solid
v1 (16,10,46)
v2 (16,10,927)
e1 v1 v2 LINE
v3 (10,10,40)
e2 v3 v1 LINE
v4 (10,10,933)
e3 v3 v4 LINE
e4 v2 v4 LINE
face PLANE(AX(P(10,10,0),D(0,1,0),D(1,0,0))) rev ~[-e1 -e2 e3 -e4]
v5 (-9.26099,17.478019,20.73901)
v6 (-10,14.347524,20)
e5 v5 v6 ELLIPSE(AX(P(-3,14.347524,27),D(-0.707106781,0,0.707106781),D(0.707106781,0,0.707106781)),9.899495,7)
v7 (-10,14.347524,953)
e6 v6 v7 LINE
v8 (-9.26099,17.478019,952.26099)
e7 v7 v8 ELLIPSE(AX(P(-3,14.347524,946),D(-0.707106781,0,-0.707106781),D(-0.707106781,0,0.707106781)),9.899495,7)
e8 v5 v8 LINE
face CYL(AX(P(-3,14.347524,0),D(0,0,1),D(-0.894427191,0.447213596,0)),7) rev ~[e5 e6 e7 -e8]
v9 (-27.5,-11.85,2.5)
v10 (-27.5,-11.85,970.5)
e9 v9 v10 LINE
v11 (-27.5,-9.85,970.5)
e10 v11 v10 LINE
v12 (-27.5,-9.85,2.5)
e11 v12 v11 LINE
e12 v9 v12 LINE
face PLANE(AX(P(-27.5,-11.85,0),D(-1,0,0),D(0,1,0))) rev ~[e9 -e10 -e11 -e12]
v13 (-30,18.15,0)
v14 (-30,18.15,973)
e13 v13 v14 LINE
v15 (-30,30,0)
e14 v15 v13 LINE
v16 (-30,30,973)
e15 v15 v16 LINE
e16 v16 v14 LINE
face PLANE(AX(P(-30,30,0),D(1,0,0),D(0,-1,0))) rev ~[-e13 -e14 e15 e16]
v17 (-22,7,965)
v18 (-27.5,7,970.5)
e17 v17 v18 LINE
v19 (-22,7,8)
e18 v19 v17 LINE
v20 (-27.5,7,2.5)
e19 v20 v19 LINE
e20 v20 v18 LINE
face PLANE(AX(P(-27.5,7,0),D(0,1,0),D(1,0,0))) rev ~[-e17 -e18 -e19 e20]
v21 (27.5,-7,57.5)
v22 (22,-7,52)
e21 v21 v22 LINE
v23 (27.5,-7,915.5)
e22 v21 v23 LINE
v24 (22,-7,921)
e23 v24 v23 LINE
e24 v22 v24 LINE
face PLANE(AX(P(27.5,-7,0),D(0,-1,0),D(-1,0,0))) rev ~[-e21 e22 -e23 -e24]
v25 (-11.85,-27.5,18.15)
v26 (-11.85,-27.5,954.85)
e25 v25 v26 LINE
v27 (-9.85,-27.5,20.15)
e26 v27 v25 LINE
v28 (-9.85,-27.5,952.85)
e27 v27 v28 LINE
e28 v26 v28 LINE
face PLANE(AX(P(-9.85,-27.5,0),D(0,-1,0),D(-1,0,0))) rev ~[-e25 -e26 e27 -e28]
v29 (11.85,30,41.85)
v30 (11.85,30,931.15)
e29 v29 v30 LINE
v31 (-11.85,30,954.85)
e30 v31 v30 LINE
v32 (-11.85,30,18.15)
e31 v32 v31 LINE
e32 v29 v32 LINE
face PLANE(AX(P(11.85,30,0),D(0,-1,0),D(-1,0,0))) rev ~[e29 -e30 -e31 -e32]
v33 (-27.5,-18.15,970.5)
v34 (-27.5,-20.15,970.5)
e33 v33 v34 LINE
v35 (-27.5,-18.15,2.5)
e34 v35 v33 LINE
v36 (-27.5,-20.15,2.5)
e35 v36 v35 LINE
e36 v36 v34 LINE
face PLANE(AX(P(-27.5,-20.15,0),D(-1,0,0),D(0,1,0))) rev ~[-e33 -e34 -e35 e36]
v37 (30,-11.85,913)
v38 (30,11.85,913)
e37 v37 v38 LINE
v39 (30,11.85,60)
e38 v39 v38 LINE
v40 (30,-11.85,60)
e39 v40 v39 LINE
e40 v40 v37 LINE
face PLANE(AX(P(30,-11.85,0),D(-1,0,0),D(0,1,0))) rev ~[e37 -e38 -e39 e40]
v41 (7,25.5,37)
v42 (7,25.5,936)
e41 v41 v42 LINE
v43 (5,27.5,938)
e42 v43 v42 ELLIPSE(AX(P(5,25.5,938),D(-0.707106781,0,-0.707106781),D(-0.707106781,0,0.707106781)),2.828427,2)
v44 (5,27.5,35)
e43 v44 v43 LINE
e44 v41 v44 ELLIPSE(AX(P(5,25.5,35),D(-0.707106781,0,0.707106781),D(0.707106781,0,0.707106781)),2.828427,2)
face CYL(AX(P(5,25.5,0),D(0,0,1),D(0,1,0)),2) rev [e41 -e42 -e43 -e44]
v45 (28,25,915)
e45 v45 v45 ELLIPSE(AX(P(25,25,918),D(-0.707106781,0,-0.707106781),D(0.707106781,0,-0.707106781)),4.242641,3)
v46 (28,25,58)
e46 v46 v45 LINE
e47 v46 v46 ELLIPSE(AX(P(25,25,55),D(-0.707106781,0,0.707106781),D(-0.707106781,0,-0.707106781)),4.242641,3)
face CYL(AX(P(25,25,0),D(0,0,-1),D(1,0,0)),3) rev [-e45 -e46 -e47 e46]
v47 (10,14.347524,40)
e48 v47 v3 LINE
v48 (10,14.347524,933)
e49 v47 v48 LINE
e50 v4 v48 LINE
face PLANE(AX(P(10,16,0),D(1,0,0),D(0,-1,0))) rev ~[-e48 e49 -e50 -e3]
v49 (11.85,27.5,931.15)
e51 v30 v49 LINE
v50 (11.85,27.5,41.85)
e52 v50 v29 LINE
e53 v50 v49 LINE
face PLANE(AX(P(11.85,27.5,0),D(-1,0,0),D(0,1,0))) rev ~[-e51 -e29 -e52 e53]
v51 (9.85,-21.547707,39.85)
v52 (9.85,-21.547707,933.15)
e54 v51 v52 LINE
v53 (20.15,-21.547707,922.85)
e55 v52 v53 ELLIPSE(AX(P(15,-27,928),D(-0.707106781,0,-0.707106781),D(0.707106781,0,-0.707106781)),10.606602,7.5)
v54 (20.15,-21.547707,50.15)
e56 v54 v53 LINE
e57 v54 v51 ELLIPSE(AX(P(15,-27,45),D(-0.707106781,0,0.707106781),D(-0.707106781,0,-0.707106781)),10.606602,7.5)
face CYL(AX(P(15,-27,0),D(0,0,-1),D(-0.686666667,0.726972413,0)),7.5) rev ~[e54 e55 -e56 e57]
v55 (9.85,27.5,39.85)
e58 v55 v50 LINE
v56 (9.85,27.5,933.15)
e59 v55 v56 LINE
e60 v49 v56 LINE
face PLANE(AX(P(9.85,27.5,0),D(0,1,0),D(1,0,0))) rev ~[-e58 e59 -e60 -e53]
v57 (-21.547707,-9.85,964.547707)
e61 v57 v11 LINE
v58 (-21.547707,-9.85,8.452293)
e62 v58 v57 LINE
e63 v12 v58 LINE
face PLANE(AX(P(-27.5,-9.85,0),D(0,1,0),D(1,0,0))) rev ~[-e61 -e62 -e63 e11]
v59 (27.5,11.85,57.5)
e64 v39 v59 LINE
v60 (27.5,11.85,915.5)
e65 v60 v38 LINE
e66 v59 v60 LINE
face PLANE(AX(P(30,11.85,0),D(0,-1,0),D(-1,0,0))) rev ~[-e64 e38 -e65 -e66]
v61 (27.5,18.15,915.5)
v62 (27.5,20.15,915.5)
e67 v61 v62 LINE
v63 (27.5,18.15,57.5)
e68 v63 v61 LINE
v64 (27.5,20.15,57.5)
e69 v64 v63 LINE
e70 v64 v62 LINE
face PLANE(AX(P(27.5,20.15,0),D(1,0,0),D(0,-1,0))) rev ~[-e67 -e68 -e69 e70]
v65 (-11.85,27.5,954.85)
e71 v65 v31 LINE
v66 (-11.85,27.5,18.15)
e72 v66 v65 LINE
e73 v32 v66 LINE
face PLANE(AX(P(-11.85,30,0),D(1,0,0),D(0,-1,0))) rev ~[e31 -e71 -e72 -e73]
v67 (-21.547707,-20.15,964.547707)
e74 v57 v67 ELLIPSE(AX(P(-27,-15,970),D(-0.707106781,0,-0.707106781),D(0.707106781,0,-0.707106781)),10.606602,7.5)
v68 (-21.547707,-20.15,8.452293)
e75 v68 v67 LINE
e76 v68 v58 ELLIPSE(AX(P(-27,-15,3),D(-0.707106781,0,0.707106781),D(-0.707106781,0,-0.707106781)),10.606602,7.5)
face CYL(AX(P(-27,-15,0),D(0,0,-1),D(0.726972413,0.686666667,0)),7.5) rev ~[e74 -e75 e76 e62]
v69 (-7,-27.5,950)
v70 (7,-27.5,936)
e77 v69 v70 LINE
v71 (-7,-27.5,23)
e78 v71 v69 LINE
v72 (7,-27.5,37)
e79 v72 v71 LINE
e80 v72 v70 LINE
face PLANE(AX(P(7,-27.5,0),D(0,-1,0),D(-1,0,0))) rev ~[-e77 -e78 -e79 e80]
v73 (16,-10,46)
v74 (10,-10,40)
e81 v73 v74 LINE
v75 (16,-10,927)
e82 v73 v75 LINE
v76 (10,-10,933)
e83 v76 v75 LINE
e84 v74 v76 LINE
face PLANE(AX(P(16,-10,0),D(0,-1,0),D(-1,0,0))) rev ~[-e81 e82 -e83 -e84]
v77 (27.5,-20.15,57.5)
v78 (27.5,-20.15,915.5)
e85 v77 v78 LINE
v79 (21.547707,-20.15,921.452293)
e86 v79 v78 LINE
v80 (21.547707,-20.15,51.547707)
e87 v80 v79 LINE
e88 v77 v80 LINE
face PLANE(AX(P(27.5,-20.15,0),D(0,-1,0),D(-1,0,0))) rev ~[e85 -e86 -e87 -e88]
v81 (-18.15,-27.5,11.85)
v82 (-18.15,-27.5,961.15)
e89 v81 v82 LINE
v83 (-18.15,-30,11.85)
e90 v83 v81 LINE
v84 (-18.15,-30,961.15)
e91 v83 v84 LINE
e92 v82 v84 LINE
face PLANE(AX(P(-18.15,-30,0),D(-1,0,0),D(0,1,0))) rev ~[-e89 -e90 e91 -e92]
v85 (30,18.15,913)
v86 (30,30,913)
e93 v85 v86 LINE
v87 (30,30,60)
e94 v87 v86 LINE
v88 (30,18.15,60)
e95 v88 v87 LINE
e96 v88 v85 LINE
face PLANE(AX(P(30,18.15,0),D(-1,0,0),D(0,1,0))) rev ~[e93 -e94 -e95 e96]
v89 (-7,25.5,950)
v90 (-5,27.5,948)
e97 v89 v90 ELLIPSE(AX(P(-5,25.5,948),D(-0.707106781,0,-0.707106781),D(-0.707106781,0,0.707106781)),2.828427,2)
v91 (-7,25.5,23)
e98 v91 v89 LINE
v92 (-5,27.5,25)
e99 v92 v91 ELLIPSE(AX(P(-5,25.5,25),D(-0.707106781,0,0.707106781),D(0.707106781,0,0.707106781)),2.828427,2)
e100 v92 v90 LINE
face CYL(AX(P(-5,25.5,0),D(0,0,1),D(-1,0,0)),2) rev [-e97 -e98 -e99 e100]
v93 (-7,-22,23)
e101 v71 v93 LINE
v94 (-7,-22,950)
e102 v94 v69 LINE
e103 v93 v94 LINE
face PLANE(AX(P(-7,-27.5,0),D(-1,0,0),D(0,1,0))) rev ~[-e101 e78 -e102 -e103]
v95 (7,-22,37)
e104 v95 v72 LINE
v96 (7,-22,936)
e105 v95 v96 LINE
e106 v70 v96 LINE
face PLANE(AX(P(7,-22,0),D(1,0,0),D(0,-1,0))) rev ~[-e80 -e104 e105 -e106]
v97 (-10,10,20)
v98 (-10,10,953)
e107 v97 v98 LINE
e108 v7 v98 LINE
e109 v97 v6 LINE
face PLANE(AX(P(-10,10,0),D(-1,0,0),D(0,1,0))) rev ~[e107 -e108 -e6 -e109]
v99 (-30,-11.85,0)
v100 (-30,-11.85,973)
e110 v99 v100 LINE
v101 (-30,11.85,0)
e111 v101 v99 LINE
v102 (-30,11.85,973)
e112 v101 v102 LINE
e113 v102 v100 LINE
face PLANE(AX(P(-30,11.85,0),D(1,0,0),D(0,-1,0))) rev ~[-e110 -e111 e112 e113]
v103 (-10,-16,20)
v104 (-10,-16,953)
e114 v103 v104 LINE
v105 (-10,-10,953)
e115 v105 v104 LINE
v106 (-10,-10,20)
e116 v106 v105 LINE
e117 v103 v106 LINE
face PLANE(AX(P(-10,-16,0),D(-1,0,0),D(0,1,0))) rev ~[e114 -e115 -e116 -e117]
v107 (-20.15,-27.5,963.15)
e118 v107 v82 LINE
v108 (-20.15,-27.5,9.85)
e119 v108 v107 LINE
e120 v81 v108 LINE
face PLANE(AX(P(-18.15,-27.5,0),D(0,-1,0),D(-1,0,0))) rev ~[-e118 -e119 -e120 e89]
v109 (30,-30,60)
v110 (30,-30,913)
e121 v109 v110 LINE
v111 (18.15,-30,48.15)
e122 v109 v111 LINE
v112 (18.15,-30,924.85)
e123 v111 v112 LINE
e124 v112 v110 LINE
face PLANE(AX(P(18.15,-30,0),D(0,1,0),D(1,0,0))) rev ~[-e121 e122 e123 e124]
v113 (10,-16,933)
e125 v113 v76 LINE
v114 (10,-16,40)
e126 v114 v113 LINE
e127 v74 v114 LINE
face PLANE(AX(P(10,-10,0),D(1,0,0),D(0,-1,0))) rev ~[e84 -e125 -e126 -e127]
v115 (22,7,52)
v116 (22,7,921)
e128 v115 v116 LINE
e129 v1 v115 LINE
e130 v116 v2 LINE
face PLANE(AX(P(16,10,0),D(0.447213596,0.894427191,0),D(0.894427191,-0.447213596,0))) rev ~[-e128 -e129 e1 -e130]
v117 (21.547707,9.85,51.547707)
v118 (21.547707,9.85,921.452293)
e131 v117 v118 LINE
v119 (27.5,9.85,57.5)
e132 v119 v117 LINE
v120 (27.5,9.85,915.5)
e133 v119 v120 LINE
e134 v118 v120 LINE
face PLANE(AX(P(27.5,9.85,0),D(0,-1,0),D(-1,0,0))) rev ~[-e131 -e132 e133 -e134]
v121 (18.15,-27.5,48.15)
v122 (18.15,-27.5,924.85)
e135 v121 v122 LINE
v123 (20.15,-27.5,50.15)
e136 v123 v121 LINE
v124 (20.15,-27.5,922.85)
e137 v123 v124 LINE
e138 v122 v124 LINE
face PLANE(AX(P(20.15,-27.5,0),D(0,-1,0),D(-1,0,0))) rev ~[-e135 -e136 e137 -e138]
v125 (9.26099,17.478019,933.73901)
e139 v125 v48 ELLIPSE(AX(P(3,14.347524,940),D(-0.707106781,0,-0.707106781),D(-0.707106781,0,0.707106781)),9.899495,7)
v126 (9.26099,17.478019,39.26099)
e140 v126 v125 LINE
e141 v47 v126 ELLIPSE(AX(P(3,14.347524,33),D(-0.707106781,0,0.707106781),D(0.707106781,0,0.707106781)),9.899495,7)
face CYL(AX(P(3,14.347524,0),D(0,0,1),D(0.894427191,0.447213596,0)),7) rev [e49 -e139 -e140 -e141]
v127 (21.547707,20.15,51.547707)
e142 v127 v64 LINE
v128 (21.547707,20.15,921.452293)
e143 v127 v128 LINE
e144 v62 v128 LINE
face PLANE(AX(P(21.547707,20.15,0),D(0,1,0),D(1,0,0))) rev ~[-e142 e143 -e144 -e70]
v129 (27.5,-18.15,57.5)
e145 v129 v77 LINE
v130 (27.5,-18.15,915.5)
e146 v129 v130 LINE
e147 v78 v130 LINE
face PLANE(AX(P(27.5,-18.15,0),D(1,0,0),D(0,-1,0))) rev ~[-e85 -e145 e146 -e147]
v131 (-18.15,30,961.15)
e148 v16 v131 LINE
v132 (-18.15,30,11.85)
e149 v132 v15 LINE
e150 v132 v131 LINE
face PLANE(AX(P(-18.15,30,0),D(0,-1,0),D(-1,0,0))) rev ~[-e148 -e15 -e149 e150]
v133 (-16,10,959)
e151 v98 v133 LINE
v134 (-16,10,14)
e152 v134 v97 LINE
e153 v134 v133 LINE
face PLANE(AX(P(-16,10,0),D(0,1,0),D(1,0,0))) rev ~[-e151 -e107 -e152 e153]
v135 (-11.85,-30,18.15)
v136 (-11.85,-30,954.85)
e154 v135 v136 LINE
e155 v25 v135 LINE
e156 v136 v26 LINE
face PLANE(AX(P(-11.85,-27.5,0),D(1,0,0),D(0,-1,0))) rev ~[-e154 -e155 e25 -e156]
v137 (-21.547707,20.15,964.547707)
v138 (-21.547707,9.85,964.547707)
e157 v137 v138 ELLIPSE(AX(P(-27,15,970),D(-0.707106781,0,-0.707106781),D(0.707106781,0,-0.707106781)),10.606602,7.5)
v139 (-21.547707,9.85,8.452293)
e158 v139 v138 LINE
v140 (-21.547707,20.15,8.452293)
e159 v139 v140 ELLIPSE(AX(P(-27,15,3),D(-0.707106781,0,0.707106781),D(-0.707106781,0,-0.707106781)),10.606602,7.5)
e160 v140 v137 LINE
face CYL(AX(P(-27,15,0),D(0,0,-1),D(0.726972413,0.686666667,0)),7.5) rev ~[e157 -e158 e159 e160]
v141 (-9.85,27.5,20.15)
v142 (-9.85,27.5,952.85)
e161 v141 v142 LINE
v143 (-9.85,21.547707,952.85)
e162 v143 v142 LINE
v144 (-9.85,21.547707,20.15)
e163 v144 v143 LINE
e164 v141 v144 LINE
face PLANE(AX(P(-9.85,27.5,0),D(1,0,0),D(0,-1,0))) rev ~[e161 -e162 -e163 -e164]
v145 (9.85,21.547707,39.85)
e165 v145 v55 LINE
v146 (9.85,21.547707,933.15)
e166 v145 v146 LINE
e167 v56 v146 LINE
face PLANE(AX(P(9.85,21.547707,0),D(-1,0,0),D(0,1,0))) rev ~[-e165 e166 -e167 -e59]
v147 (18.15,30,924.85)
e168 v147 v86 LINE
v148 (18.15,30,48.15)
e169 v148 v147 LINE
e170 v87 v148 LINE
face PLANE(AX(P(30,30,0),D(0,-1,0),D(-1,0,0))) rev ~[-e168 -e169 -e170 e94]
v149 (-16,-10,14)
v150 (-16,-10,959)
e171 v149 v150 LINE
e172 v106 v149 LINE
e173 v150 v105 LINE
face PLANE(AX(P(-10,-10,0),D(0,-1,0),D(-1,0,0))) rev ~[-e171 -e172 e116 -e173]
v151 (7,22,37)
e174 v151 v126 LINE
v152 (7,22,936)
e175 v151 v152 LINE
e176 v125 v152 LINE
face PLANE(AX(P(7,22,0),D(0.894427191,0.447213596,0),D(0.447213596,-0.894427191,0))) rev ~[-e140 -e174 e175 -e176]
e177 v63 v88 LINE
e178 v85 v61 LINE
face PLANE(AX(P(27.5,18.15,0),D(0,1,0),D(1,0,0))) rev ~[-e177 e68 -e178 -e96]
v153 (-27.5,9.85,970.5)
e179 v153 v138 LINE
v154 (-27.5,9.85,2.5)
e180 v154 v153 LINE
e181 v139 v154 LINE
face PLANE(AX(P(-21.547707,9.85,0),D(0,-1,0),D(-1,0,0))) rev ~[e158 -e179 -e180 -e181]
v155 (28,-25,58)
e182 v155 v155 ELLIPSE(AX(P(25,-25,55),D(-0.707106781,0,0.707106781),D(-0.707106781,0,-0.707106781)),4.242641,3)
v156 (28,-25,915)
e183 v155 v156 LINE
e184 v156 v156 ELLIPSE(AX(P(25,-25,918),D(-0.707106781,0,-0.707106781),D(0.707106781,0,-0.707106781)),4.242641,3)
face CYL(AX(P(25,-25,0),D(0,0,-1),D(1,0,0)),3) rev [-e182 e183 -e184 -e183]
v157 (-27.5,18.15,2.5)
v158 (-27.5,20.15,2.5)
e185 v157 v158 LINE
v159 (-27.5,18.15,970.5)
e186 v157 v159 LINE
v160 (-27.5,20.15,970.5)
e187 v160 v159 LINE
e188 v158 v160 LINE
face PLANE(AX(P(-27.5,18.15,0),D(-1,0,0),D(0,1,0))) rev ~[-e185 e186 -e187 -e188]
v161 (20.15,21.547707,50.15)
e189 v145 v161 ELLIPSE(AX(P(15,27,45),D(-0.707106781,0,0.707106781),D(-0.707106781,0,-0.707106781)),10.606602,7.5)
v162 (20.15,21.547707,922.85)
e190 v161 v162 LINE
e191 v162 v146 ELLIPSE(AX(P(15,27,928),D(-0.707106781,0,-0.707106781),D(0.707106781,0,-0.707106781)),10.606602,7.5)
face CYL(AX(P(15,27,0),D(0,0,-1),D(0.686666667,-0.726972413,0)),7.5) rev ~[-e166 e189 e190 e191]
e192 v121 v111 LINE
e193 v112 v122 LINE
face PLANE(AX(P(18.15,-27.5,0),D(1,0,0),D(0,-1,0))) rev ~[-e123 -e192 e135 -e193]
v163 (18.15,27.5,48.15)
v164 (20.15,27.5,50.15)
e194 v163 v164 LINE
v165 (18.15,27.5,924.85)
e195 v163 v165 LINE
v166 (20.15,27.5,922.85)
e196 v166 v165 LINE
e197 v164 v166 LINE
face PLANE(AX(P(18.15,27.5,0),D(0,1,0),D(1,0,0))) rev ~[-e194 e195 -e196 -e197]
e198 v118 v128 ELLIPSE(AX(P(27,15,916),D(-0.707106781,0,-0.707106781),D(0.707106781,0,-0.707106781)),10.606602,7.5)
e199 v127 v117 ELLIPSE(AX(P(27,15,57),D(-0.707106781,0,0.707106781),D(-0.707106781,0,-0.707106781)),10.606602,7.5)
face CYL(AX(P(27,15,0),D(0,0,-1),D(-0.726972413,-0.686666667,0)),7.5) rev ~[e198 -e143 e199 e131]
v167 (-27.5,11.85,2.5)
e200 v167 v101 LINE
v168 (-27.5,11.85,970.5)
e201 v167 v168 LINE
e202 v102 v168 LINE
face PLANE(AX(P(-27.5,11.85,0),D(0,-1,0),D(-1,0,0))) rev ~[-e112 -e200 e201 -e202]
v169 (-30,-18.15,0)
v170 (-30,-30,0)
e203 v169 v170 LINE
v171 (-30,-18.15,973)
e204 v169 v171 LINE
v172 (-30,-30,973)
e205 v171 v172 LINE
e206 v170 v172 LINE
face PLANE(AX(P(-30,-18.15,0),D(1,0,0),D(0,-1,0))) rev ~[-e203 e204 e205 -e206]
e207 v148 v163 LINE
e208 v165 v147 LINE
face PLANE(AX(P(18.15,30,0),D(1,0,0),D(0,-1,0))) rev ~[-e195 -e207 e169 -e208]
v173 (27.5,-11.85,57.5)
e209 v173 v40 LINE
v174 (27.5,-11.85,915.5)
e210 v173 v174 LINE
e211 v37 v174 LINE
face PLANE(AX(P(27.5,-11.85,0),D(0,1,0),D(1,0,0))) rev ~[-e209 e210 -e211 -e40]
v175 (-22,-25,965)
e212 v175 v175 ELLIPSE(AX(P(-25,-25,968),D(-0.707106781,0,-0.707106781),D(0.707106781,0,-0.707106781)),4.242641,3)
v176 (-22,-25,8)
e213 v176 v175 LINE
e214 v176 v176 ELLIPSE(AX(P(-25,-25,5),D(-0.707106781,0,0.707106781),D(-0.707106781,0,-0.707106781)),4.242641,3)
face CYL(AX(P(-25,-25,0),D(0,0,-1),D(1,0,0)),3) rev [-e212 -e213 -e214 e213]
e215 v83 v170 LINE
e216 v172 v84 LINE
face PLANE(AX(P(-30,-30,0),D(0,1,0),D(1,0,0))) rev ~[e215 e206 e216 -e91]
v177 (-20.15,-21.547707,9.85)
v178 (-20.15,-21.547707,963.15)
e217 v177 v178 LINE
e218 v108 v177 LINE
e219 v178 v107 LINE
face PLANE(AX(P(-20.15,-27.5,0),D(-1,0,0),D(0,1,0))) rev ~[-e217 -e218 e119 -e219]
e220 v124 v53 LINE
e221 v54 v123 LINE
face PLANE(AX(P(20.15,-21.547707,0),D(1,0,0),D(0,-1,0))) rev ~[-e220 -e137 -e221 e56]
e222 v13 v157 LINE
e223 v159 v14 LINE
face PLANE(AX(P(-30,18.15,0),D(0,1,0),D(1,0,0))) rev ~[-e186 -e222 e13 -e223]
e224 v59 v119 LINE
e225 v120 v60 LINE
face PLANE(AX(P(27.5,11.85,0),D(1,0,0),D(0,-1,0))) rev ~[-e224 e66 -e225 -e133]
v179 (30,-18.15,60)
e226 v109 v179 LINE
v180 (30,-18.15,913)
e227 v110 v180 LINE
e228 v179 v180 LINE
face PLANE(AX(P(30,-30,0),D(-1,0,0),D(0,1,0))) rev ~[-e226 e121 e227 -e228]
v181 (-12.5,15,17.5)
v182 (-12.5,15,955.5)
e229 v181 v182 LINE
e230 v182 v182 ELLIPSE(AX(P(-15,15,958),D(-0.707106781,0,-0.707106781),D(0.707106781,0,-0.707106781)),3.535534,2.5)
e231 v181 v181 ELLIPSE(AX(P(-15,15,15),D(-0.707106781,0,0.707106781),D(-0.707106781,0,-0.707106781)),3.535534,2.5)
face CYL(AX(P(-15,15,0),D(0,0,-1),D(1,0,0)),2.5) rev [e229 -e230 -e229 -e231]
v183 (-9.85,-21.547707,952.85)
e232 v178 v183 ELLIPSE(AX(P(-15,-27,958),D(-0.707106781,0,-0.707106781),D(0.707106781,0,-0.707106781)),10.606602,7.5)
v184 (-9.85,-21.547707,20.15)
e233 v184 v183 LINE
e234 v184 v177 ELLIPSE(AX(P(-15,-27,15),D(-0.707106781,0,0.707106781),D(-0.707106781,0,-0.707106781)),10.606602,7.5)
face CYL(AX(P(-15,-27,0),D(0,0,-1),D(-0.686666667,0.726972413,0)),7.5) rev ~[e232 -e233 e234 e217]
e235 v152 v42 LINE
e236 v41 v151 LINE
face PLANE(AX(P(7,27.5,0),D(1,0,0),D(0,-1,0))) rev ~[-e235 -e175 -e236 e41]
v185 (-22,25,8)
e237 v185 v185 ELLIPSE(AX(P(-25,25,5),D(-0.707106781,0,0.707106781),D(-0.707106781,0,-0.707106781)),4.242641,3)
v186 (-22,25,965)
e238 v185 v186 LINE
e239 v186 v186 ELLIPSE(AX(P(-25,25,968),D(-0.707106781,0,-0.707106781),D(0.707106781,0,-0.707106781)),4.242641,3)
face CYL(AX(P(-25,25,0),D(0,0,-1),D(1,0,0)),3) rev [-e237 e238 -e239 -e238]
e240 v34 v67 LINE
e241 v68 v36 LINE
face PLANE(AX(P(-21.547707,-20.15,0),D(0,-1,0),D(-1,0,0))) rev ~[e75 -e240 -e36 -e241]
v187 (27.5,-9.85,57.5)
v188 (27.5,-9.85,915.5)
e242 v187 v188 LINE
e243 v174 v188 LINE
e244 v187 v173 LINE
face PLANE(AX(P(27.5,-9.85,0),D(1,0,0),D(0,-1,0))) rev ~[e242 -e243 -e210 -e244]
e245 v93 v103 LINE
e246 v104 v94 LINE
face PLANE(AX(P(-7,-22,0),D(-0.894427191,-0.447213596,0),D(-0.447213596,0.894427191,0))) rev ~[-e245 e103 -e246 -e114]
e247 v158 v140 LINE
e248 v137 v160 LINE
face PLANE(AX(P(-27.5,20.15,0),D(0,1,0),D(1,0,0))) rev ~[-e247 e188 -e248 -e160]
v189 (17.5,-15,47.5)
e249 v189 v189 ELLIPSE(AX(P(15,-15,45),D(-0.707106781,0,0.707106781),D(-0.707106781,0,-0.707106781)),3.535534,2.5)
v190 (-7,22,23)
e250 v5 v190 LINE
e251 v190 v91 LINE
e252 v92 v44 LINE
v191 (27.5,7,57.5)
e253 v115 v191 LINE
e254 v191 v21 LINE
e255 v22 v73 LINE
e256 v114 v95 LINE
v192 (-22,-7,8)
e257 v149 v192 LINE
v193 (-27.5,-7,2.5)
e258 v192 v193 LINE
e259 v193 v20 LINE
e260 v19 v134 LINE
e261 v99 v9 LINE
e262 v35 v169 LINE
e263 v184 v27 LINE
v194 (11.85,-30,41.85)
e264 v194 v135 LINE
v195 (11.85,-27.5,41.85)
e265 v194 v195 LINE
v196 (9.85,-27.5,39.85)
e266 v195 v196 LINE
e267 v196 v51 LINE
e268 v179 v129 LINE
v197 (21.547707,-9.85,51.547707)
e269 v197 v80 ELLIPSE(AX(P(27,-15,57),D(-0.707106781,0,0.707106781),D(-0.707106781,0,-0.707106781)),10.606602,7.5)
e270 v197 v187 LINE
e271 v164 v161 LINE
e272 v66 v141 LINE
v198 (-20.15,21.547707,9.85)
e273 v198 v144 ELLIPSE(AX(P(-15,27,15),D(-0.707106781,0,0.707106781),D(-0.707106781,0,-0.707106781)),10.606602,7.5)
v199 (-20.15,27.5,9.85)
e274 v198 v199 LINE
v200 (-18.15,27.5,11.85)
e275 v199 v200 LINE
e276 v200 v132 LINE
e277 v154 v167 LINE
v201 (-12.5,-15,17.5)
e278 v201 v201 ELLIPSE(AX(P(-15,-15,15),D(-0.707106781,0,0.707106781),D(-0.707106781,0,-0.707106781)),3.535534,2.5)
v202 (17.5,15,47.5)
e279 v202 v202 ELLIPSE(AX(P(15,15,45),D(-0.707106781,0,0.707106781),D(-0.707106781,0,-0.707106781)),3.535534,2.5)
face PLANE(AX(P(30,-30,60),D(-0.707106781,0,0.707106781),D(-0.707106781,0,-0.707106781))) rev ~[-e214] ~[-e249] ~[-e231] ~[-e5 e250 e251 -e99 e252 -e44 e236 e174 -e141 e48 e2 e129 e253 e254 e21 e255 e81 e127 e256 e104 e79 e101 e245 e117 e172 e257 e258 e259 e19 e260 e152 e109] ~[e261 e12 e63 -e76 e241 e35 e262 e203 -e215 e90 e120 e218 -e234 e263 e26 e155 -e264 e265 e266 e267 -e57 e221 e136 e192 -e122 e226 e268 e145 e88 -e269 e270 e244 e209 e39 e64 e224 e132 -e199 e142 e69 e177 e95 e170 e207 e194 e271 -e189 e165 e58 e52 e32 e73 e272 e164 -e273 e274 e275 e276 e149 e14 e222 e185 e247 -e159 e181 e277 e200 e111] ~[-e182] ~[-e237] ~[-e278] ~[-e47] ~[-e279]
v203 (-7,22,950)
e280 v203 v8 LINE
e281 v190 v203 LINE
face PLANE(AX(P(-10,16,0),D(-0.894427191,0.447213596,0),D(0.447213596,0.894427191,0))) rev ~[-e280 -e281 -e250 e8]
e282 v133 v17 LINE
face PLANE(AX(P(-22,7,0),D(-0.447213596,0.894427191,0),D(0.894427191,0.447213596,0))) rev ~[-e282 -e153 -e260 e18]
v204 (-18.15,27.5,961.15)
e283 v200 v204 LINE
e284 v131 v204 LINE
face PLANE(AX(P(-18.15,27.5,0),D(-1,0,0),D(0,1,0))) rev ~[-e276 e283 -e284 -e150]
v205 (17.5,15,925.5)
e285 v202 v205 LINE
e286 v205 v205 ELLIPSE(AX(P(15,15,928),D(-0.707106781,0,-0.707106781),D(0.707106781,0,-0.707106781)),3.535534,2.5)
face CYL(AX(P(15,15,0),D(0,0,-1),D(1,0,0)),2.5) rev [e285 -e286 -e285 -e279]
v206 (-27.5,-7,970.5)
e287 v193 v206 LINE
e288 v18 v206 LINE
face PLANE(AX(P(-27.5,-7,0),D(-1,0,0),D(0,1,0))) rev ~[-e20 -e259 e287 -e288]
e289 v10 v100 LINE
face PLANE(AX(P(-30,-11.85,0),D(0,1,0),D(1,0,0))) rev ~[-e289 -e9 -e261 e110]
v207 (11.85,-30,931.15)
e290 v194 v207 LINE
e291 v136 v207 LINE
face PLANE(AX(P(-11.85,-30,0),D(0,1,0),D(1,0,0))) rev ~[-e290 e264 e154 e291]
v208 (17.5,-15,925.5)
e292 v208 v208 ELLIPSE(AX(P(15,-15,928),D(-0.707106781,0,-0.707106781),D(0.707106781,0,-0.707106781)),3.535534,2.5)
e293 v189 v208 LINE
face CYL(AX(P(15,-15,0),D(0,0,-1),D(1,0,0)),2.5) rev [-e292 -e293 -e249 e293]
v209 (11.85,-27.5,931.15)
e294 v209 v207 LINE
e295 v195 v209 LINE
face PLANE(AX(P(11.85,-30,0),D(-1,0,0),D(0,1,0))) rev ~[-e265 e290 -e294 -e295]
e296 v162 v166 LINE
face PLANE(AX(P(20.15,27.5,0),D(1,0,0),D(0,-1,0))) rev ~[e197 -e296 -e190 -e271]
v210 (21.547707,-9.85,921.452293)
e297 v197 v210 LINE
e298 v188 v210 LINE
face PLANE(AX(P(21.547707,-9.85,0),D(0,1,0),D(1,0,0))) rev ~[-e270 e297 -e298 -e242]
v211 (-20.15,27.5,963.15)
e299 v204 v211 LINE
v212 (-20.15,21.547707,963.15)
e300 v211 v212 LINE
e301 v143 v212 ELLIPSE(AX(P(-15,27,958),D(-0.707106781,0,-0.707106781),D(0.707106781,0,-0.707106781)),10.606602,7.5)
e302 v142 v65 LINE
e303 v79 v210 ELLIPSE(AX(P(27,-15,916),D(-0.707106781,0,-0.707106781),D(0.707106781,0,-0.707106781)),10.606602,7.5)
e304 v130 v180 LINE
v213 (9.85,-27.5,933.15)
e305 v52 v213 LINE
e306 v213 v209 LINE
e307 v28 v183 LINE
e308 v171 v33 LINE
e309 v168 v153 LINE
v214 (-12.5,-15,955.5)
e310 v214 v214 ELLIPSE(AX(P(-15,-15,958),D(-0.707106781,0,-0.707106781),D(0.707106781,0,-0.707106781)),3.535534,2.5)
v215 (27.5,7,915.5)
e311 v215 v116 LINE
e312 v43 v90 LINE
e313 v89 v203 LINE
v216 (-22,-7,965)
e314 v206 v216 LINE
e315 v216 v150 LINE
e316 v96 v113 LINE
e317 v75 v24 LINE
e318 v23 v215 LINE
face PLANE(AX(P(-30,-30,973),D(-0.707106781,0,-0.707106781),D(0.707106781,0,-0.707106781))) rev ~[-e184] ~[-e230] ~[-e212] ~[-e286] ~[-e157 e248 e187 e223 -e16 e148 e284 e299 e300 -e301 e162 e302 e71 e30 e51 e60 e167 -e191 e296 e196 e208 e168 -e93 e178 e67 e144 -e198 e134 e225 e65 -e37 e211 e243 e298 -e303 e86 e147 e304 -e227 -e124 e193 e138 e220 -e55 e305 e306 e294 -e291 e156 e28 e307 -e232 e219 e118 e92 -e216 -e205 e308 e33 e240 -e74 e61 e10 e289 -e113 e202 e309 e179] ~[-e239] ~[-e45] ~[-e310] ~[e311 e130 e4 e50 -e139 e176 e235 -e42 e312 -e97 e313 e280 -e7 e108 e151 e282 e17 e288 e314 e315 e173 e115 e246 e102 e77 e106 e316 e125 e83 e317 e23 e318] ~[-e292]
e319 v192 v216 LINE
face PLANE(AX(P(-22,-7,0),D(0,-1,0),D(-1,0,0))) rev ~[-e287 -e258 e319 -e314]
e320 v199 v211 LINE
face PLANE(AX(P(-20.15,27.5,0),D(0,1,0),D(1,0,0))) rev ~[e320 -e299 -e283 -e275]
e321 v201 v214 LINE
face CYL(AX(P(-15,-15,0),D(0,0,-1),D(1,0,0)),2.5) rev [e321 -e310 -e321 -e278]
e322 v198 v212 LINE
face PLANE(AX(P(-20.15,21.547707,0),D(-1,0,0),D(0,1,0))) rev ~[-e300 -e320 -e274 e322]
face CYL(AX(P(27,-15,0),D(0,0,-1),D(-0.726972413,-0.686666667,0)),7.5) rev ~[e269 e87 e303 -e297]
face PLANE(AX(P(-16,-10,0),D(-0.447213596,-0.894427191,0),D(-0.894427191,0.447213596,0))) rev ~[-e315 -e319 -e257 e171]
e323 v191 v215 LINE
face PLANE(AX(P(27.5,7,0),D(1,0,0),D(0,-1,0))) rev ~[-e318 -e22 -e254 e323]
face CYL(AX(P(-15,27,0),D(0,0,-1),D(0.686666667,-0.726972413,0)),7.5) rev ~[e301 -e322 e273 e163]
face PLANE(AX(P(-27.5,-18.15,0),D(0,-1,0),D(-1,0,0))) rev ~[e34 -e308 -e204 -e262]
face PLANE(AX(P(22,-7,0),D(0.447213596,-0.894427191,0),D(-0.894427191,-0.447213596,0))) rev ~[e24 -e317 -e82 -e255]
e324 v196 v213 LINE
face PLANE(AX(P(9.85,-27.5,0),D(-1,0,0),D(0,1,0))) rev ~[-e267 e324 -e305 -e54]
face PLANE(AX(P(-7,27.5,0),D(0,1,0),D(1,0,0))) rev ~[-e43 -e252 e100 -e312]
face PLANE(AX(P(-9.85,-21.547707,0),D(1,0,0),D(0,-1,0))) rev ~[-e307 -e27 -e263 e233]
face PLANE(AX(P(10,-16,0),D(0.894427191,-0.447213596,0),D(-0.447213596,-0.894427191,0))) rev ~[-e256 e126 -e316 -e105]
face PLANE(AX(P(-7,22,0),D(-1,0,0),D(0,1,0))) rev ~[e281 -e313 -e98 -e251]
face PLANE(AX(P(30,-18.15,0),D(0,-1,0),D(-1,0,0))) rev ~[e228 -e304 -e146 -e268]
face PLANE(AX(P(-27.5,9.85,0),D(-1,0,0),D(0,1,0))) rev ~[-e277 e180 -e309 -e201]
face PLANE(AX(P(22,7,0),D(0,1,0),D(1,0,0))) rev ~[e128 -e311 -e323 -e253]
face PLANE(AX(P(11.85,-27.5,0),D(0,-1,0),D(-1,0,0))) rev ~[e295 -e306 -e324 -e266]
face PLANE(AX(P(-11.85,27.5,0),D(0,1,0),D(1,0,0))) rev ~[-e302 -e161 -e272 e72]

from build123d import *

# Parameters (mm, degrees)
F0_R     = 3
F0_R_2   = 2.5
F1_DEPTH = 973
F2_R     = 2
F3_R     = 7
F5_DEPTH = 60


# Not quite as in the source:
# - a feature names something its author has since deleted; it is built from what else it names


with BuildPart() as f1:
    # F0 (on Top) → F1 (new body)
    with BuildSketch(Plane.XY):
        with BuildLine():
            Line((18.15, -30), (30, -30))
            Line((30, -30), (30, -18.15))
            Line((30, -18.15), (27.5, -18.15))
            Line((27.5, -18.15), (27.5, -20.15))
            Line((27.5, -20.15), (21.5477069044, -20.15))
            ThreePointArc((21.5477069044, -20.15), (19.5, -15), (21.5477069044, -9.85))
            Line((21.5477069044, -9.85), (27.5, -9.85))
            Line((27.5, -9.85), (27.5, -11.85))
            Line((27.5, -11.85), (30, -11.85))
            Line((30, -11.85), (30, 11.85))
            Line((30, 11.85), (27.5, 11.85))
            Line((27.5, 11.85), (27.5, 9.85))
            Line((27.5, 9.85), (21.5477069044, 9.85))
            ThreePointArc((21.5477069044, 9.85), (19.5, 15), (21.5477069044, 20.15))
            Line((21.5477069044, 20.15), (27.5, 20.15))
            Line((27.5, 20.15), (27.5, 18.15))
            Line((27.5, 18.15), (30, 18.15))
            Line((30, 18.15), (30, 30))
            Line((30, 30), (18.15, 30))
            Line((18.15, 30), (18.15, 27.5))
            Line((18.15, 27.5), (20.15, 27.5))
            Line((20.15, 27.5), (20.15, 21.5477069044))
            ThreePointArc((20.15, 21.5477069044), (15, 19.5), (9.85, 21.5477069044))
            Line((9.85, 21.5477069044), (9.85, 27.5))
            Line((9.85, 27.5), (11.85, 27.5))
            Line((11.85, 27.5), (11.85, 30))
            Line((11.85, 30), (-11.85, 30))
            Line((-11.85, 30), (-11.85, 27.5))
            Line((-11.85, 27.5), (-9.85, 27.5))
            Line((-9.85, 27.5), (-9.85, 21.5477069044))
            ThreePointArc((-9.85, 21.5477069044), (-15, 19.5), (-20.15, 21.5477069044))
            Line((-20.15, 21.5477069044), (-20.15, 27.5))
            Line((-20.15, 27.5), (-18.15, 27.5))
            Line((-18.15, 27.5), (-18.15, 30))
            Line((-18.15, 30), (-30, 30))
            Line((-30, 30), (-30, 18.15))
            Line((-30, 18.15), (-27.5, 18.15))
            Line((-27.5, 18.15), (-27.5, 20.15))
            Line((-27.5, 20.15), (-21.5477069044, 20.15))
            ThreePointArc((-21.5477069044, 20.15), (-19.5, 15), (-21.5477069044, 9.85))
            Line((-21.5477069044, 9.85), (-27.5, 9.85))
            Line((-27.5, 9.85), (-27.5, 11.85))
            Line((-27.5, 11.85), (-30, 11.85))
            Line((-30, 11.85), (-30, -11.85))
            Line((-30, -11.85), (-27.5, -11.85))
            Line((-27.5, -11.85), (-27.5, -9.85))
            Line((-27.5, -9.85), (-21.5477069044, -9.85))
            ThreePointArc((-21.5477069044, -9.85), (-19.5, -15), (-21.5477069044, -20.15))
            Line((-21.5477069044, -20.15), (-27.5, -20.15))
            Line((-27.5, -20.15), (-27.5, -18.15))
            Line((-27.5, -18.15), (-30, -18.15))
            Line((-30, -18.15), (-30, -30))
            Line((-30, -30), (-18.15, -30))
            Line((-18.15, -30), (-18.15, -27.5))
            Line((-18.15, -27.5), (-20.15, -27.5))
            Line((-20.15, -27.5), (-20.15, -21.5477069044))
            ThreePointArc((-20.15, -21.5477069044), (-15, -19.5), (-9.85, -21.5477069044))
            Line((-9.85, -21.5477069044), (-9.85, -27.5))
            Line((-9.85, -27.5), (-11.85, -27.5))
            Line((-11.85, -27.5), (-11.85, -30))
            Line((-11.85, -30), (11.85, -30))
            Line((11.85, -30), (11.85, -27.5))
            Line((11.85, -27.5), (9.85, -27.5))
            Line((9.85, -27.5), (9.85, -21.5477069044))
            ThreePointArc((9.85, -21.5477069044), (15, -19.5), (20.15, -21.5477069044))
            Line((20.15, -21.5477069044), (20.15, -27.5))
            Line((20.15, -27.5), (18.15, -27.5))
            Line((18.15, -27.5), (18.15, -30))
        make_face()
        with Locations((-25, -25)):
            Circle(F0_R, mode=Mode.SUBTRACT)
        with Locations((-15, -15)):
            Circle(F0_R_2, mode=Mode.SUBTRACT)
        with Locations((25, -25)):
            Circle(F0_R, mode=Mode.SUBTRACT)
        with Locations((15, -15)):
            Circle(F0_R_2, mode=Mode.SUBTRACT)
        with Locations((-25, 25)):
            Circle(F0_R, mode=Mode.SUBTRACT)
        with Locations((-15, 15)):
            Circle(F0_R_2, mode=Mode.SUBTRACT)
        Polygon((-7, 22), (-7, 27.5), (0, 27.5), (7, 27.5), (7, 22), (10, 16), (10, 10), (16, 10), (22, 7), (27.5, 7), (27.5, 0), (27.5, -7), (22, -7), (16, -10), (10, -10), (10, -16), (7, -22), (7, -27.5), (0, -27.5), (-7, -27.5), (-7, -22), (-10, -16), (-10, -10), (-16, -10), (-22, -7), (-27.5, -7), (-27.5, 0), (-27.5, 7), (-22, 7), (-16, 10), (-10, 10), (-10, 16), align=None, mode=Mode.SUBTRACT)
        with Locations((15, 15)):
            Circle(F0_R_2, mode=Mode.SUBTRACT)
        with Locations((25, 25)):
            Circle(F0_R, mode=Mode.SUBTRACT)
    extrude(amount=F1_DEPTH)

    # F2
    f2_edges = [f1.edges().sort_by_distance(p)[0] for p in [
        (-7, 27.5, 486.5),
        (7, 27.5, 486.5),
    ]]
    fillet(f2_edges, radius=F2_R)

    # F3
    f3_edges = [f1.edges().sort_by_distance(p)[0] for p in [
        (-10, 16, 486.5),
        (10, 16, 486.5),
    ]]
    fillet(f3_edges, radius=F3_R)

    # F4 (on face) → F5 (cut)
    with BuildSketch(Plane.XZ.offset(30)):
        Polygon((30, 0), (30, 60), (-30, 0), (-18.15, 0), align=None)
        Polygon((30, 913), (30, 973), (-18.15, 973), (-30, 973), align=None)
    extrude(amount=-F5_DEPTH, mode=Mode.SUBTRACT)


solid = f1.part
